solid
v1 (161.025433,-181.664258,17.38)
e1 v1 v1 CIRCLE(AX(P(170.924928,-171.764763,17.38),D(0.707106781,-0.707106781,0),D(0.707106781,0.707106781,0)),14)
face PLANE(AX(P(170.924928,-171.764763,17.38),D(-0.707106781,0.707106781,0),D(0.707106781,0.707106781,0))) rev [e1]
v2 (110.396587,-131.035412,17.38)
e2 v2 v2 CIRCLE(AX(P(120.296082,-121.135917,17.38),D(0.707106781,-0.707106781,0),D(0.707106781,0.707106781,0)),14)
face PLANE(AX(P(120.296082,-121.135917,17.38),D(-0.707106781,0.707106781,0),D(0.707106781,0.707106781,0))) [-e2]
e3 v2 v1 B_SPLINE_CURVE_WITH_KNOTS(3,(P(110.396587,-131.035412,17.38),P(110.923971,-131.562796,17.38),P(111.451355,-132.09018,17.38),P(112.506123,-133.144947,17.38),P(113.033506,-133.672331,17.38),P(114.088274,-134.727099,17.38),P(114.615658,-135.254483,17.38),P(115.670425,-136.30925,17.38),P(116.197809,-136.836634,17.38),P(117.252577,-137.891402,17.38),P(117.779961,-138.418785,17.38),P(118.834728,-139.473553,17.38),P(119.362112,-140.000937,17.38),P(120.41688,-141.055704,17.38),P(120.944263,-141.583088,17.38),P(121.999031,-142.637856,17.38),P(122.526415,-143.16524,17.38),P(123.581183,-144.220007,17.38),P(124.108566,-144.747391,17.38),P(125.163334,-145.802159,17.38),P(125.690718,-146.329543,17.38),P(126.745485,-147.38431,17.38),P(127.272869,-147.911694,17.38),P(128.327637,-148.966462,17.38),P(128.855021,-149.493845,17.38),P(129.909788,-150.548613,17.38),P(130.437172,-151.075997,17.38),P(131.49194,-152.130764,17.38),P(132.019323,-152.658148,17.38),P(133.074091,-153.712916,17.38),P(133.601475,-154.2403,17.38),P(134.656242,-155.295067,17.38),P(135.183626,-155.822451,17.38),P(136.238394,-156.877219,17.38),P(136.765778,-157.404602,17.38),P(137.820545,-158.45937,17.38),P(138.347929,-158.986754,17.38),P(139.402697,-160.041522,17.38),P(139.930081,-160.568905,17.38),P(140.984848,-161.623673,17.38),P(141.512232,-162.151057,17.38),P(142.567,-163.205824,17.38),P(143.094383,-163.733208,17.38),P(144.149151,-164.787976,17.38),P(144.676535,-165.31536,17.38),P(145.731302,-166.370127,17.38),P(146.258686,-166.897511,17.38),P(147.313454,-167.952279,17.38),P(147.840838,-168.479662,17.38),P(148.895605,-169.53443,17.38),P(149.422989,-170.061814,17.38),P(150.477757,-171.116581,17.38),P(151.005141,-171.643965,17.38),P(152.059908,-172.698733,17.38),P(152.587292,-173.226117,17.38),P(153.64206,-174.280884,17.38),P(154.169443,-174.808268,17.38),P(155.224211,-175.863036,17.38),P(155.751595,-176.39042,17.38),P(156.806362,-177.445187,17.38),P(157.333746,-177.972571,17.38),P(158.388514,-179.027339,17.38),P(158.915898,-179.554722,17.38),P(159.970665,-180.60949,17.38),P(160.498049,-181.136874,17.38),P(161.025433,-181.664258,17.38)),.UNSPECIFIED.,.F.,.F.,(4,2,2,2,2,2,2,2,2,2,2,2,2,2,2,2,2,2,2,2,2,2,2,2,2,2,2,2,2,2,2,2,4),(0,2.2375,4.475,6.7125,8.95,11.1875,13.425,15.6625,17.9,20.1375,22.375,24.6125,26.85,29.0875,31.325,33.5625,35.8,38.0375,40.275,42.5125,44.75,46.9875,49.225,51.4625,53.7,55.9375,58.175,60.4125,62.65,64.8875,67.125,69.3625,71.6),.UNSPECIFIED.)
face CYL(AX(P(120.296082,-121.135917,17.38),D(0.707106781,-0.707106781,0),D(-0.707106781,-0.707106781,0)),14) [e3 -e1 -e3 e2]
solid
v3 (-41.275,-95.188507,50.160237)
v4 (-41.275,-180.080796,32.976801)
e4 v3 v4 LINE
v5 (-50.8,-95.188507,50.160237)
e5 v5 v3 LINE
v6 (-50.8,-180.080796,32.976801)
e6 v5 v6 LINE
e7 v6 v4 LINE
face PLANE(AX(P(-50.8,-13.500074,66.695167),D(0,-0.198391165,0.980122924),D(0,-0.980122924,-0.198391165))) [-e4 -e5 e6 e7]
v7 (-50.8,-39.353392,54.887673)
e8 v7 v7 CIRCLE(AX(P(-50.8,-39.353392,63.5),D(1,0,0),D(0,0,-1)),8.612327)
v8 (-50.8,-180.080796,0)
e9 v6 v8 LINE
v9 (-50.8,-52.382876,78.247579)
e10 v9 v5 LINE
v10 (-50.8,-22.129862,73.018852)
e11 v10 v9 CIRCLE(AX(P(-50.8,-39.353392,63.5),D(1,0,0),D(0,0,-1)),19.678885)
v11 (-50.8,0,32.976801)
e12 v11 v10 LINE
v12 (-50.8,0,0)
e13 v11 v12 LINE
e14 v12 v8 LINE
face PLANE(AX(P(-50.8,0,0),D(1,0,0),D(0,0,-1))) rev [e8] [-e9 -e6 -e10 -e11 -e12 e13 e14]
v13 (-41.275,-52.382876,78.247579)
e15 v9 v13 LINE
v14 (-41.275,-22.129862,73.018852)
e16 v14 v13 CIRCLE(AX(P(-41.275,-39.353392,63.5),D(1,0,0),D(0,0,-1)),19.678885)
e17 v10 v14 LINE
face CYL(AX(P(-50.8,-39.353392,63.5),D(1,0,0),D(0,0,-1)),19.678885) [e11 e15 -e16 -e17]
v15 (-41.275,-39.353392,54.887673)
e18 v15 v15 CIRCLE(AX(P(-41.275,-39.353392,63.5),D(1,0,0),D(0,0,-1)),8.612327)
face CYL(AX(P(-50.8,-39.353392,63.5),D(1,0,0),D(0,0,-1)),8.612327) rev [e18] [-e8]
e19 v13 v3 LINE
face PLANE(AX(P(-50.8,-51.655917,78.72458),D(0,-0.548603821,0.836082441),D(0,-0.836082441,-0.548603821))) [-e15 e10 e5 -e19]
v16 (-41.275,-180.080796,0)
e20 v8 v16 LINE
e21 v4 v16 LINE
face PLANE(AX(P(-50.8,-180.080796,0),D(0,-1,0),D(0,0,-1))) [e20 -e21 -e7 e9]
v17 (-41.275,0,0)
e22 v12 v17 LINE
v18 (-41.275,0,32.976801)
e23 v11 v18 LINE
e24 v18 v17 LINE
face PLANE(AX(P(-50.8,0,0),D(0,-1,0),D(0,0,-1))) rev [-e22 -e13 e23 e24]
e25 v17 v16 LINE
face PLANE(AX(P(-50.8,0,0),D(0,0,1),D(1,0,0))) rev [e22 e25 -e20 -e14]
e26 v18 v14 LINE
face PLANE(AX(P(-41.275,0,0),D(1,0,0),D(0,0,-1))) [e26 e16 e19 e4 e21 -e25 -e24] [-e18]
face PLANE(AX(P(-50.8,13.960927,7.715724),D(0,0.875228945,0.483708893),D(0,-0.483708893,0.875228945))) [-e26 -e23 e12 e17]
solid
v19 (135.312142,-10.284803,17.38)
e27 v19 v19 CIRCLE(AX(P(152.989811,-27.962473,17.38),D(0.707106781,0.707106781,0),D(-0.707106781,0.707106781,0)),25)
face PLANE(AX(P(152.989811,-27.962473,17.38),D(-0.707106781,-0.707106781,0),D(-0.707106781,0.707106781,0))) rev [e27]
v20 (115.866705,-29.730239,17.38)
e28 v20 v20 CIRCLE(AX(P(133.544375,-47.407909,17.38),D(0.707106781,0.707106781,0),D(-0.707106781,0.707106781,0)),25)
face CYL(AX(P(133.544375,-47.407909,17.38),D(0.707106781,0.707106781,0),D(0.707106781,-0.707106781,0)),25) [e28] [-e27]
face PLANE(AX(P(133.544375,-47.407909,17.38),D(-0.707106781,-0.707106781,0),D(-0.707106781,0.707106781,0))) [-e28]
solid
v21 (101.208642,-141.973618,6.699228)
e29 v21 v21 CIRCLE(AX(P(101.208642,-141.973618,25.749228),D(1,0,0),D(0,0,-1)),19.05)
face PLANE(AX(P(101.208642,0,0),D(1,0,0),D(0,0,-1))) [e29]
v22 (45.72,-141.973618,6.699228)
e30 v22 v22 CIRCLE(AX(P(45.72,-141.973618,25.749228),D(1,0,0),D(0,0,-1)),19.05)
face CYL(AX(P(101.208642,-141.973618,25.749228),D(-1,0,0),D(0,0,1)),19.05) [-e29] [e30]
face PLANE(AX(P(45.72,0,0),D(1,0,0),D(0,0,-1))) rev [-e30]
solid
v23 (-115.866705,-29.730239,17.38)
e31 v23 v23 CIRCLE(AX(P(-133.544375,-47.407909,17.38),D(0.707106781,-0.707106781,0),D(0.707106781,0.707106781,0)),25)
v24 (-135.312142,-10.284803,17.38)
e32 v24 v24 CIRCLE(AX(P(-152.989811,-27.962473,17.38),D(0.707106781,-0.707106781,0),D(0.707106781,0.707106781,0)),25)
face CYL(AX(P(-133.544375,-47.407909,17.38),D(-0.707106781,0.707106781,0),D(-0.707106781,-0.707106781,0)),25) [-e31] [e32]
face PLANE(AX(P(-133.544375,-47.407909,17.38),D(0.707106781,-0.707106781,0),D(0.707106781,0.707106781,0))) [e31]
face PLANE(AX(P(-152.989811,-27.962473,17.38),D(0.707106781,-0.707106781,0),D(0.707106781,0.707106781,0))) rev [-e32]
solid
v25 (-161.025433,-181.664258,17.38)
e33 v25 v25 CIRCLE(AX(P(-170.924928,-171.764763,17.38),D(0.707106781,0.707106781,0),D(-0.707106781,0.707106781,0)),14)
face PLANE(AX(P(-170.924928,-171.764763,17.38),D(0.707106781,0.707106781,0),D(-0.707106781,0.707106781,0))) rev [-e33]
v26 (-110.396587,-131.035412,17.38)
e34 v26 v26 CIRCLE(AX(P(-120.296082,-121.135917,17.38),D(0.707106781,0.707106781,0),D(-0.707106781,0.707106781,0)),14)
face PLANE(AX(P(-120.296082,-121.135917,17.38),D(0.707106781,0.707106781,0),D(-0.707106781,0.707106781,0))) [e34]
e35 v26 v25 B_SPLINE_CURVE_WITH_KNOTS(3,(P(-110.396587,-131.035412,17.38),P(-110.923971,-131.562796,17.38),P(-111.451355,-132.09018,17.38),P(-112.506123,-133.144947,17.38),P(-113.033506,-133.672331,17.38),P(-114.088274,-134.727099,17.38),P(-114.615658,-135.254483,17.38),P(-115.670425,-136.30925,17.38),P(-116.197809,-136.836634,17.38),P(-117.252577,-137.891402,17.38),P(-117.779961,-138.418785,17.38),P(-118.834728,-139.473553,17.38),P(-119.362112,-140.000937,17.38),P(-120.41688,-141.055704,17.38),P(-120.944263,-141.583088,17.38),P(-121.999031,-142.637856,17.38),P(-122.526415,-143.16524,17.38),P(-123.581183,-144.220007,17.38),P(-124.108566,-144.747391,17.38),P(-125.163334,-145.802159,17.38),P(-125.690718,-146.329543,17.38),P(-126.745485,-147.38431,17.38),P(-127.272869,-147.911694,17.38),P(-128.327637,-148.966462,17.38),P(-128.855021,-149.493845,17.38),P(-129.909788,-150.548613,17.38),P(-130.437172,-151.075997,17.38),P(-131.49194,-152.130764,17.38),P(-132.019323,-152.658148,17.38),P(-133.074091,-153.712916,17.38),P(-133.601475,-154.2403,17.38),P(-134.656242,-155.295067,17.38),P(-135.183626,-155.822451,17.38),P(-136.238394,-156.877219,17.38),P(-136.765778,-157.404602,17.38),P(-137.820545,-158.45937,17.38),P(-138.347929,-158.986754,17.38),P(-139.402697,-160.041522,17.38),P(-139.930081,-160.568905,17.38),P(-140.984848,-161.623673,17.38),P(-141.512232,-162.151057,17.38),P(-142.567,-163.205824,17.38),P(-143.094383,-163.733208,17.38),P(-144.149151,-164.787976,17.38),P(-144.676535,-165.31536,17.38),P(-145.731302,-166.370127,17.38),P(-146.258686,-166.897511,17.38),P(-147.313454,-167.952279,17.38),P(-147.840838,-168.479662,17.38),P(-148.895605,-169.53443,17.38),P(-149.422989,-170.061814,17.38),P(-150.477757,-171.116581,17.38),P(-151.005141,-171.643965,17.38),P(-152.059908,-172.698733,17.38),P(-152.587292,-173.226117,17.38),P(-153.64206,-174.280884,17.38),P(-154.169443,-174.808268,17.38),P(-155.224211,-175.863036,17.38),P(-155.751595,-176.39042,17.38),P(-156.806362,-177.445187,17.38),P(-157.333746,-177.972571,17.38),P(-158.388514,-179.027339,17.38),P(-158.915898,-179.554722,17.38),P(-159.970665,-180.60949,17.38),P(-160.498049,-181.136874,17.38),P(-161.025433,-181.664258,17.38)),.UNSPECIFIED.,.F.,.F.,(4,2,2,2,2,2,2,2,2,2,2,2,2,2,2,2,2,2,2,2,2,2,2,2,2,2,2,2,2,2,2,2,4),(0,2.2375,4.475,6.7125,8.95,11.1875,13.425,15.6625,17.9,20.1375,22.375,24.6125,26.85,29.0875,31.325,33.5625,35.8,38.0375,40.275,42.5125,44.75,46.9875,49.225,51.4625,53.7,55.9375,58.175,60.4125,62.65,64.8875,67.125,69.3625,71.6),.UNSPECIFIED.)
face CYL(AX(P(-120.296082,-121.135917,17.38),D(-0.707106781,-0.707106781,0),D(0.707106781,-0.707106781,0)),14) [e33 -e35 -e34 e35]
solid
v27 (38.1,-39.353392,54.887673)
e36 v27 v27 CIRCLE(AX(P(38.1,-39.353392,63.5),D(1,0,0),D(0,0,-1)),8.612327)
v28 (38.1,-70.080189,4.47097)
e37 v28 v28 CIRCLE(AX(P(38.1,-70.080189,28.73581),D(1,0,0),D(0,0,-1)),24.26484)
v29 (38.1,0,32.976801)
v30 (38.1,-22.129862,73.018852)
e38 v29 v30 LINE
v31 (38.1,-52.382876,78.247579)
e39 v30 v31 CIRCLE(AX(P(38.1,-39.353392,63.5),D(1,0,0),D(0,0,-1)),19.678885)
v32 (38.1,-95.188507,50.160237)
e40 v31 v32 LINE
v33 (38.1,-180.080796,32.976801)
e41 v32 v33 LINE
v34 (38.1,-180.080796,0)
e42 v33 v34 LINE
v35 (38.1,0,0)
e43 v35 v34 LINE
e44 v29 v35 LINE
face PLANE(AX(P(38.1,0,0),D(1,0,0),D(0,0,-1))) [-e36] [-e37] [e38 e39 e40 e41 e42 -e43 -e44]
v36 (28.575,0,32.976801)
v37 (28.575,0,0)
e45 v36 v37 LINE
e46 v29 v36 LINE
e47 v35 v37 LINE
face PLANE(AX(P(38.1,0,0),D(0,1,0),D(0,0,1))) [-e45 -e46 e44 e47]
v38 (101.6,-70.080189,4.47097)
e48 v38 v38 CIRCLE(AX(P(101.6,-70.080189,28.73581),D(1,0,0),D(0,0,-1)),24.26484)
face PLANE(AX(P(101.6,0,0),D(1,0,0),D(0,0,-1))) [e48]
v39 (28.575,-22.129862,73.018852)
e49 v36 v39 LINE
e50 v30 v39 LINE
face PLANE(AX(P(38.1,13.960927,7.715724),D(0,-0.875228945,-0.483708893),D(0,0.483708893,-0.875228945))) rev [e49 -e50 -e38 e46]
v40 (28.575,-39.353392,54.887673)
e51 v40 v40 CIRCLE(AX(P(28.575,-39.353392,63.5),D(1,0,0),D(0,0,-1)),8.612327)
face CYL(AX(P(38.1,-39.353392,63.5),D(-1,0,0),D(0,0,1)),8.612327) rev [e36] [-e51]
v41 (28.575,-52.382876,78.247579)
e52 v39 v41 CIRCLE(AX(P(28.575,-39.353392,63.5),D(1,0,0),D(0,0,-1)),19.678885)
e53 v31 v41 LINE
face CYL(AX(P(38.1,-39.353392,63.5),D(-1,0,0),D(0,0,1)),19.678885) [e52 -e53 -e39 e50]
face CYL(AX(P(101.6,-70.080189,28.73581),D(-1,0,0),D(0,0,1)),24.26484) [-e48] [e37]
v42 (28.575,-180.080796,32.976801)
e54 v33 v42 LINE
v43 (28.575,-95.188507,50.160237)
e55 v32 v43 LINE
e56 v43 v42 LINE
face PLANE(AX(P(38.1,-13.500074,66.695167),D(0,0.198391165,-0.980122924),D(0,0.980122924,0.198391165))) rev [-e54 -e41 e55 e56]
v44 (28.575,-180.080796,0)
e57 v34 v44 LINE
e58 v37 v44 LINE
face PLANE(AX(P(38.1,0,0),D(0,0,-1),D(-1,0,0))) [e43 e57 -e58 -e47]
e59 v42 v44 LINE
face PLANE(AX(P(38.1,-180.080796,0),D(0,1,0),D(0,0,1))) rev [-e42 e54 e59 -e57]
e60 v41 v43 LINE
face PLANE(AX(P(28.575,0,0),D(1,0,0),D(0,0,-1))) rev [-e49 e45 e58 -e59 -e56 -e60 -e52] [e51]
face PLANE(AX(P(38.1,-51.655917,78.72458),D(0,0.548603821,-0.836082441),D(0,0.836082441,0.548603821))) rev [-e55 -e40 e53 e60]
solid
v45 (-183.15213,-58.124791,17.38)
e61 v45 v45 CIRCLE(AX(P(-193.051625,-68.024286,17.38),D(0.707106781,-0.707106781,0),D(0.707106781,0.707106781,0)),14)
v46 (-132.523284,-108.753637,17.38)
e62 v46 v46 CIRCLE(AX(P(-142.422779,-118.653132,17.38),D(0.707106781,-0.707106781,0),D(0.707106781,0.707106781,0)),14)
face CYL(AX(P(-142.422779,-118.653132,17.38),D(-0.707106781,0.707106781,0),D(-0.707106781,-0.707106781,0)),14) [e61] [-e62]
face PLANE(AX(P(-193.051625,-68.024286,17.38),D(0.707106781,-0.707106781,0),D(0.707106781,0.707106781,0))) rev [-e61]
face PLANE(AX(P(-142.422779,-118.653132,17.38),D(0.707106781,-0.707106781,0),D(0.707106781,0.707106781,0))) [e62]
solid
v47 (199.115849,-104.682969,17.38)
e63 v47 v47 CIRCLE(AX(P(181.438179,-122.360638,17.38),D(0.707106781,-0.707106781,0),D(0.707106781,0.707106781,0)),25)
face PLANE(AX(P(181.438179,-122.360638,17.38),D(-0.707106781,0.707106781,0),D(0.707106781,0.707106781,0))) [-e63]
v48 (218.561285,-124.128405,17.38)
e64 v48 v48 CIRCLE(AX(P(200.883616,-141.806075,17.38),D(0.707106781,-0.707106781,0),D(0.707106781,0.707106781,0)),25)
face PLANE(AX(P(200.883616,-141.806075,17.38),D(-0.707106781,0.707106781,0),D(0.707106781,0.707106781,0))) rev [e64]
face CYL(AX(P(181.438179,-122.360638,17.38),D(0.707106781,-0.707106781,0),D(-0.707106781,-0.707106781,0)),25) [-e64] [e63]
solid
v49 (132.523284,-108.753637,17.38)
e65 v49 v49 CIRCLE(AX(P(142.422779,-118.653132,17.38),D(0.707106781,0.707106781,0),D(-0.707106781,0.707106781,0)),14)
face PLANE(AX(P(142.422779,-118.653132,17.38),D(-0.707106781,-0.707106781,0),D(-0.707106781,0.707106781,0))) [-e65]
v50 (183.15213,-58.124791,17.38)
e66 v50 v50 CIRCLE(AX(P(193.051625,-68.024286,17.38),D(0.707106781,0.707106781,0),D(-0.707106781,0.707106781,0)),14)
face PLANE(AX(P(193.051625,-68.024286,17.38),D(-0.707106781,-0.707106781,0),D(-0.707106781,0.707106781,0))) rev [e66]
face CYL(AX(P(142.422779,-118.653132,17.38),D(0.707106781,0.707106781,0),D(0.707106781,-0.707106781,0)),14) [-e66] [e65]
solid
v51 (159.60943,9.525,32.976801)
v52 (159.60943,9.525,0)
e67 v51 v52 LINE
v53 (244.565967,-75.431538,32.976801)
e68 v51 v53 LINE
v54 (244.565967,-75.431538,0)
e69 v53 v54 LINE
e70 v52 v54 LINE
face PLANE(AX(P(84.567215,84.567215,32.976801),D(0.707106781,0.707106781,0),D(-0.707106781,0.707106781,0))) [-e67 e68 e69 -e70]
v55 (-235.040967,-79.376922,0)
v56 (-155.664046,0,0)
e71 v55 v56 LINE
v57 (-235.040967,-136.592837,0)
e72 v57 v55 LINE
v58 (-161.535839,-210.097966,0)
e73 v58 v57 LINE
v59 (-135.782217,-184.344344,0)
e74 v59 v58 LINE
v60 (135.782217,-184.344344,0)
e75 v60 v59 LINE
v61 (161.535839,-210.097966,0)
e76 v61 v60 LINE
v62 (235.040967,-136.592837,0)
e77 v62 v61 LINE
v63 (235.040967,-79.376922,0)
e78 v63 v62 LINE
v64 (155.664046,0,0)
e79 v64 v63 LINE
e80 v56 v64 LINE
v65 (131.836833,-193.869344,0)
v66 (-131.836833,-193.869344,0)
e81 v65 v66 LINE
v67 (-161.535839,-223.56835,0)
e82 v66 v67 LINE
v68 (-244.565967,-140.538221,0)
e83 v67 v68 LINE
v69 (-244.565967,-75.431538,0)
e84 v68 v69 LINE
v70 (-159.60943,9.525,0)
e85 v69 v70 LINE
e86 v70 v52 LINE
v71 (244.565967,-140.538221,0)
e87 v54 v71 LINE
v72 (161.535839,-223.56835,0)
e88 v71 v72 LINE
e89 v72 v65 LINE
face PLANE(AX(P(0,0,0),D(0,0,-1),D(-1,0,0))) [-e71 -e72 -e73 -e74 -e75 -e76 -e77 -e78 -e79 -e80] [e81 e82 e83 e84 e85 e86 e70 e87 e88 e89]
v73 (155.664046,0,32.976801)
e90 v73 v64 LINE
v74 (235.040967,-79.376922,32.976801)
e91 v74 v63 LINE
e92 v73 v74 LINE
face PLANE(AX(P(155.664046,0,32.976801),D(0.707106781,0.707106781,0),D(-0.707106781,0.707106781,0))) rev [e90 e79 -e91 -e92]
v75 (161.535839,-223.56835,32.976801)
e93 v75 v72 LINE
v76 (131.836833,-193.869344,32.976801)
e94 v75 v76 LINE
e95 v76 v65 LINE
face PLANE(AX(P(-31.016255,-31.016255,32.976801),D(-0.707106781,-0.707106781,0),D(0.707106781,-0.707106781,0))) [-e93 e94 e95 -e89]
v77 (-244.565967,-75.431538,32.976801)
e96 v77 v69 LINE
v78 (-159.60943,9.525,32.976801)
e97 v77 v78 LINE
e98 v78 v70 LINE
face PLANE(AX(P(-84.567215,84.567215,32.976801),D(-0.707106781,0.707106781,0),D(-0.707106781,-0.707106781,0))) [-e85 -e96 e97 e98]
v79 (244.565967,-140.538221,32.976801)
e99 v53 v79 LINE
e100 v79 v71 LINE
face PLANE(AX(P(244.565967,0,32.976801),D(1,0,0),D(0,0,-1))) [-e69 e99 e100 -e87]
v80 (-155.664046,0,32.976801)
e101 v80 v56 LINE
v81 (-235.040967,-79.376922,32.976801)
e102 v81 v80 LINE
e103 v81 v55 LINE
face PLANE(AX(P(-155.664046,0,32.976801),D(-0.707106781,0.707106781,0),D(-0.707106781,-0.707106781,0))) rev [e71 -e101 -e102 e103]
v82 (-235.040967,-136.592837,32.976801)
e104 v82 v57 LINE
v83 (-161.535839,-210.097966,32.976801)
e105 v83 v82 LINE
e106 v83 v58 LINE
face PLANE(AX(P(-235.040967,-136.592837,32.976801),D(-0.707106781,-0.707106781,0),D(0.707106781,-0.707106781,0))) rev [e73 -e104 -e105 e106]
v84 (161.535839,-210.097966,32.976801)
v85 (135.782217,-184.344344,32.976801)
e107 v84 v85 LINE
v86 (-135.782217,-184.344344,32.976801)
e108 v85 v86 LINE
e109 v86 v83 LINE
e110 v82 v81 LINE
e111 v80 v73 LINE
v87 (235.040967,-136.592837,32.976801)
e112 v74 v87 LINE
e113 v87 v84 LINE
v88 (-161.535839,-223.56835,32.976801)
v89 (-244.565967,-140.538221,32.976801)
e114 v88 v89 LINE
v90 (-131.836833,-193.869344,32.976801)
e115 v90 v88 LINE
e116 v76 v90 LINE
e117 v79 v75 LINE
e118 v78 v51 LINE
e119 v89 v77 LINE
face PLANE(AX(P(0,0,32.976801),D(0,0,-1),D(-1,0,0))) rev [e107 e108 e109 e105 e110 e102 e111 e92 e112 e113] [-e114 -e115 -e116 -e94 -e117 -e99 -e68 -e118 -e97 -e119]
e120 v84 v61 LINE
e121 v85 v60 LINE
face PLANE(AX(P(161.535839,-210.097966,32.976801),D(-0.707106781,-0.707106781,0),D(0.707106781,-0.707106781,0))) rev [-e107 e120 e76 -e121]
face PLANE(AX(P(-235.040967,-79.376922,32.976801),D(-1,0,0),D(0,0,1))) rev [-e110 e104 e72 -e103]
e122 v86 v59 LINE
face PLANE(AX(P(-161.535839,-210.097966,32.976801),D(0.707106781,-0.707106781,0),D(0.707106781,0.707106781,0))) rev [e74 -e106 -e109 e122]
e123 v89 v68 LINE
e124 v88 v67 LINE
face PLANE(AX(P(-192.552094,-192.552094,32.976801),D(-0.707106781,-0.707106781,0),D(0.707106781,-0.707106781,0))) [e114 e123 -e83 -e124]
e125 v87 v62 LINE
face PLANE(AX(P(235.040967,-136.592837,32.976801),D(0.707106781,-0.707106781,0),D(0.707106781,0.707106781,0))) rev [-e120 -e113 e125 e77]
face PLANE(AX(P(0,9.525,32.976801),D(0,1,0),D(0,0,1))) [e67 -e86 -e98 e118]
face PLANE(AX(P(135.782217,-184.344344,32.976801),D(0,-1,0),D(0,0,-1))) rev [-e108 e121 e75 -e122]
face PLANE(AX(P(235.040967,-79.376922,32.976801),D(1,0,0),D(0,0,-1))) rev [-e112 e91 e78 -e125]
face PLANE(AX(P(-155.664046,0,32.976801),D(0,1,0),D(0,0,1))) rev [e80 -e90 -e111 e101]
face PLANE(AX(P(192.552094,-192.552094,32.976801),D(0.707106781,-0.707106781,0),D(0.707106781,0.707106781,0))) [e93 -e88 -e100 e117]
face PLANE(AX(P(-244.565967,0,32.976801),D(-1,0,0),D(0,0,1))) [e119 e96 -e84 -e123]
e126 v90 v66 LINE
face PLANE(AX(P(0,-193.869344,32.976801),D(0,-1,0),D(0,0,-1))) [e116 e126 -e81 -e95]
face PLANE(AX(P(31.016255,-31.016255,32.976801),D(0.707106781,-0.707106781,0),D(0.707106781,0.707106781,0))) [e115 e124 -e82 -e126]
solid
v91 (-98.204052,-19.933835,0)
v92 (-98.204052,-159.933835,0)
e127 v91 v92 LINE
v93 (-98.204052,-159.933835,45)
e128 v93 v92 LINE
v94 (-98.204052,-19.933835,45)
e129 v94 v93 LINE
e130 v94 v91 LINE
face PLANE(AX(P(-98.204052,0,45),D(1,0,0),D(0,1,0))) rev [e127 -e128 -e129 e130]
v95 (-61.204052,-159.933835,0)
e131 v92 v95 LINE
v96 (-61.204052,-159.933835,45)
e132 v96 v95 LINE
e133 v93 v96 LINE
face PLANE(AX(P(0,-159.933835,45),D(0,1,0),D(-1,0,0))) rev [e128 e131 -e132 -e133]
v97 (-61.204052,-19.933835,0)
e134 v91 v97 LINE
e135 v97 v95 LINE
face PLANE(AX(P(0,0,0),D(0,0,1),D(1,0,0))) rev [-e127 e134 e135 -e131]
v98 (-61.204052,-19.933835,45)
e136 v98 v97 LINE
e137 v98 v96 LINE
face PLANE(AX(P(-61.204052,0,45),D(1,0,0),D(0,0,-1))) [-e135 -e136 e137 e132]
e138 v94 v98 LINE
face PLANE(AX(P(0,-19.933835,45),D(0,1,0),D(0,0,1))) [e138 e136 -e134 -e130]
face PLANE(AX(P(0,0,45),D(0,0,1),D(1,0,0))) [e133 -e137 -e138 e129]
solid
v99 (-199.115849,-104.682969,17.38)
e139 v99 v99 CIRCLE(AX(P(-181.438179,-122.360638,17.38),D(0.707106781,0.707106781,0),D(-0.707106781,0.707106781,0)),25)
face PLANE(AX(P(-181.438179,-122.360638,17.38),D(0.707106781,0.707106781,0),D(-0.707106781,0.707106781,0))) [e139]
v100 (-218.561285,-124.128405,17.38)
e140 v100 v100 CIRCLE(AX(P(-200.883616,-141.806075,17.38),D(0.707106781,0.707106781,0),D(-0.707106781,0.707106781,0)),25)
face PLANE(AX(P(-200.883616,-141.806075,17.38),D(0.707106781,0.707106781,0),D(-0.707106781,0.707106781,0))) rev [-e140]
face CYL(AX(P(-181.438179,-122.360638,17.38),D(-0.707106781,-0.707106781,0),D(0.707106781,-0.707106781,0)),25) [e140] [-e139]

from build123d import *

# Parameters (mm, degrees)
BOSS_EXTRUDE1_OUTLINE_W = 37
BOSS_EXTRUDE1_OUTLINE_H = 140
BOSS_EXTRUDE1_DEPTH     = 45
BOSS_EXTRUDE10_START    = 45.72
SKETCH9_R               = 19.05
BOSS_EXTRUDE10_DEPTH    = 55.488642
BOSS_EXTRUDE11_START    = 38.1
SKETCH9_3_R             = 24.264839711
BOSS_EXTRUDE11_DEPTH    = 63.5
SKETCH2_R               = 25
BOSS_EXTRUDE6_DEPTH     = 27.5
SKETCH3_R               = 25
BOSS_EXTRUDE7_DEPTH     = 27.5
SKETCH4_R               = 14
BOSS_EXTRUDE8_DEPTH     = 71.6
SKETCH5_R               = 14
BOSS_EXTRUDE9_DEPTH     = 71.6
BOSS_EXTRUDE12_START    = -41.275
SKETCH8_R               = 8.612326573
BOSS_EXTRUDE12_DEPTH    = 9.525
BOSS_EXTRUDE13_START    = 28.575
SKETCH8_3_R             = 8.612326573
BOSS_EXTRUDE13_DEPTH    = 9.525
EXTRUDE_THIN2_DEPTH     = 32.9768


# Read off the part's stored shape, not the designer's step: Boss-Extrude1
with BuildPart() as part:
    # Boss-Extrude1 outline → Boss-Extrude1 (new body)
    with BuildSketch(Plane.XY):
        with Locations((-79.704052147, -89.933835326)):
            Rectangle(BOSS_EXTRUDE1_OUTLINE_W, BOSS_EXTRUDE1_OUTLINE_H)
    extrude(amount=BOSS_EXTRUDE1_DEPTH)


with BuildPart() as body_2:
    # Sketch9 → Boss-Extrude10 (new body)
    with BuildSketch(Plane(origin=(0, 0, 0), x_dir=(0, 0, -1), z_dir=(1, 0, 0)).offset(BOSS_EXTRUDE10_START)):
        with Locations((-25.749228435, -141.973618126)):
            Circle(SKETCH9_R)
    extrude(amount=BOSS_EXTRUDE10_DEPTH)


with BuildPart() as body_3:
    # Sketch9<3> → Boss-Extrude11 (new body)
    with BuildSketch(Plane(origin=(0, 0, 0), x_dir=(0, 0, -1), z_dir=(1, 0, 0)).offset(BOSS_EXTRUDE11_START)):
        with Locations((-28.735809635, -70.080189422)):
            Circle(SKETCH9_3_R)
    extrude(amount=BOSS_EXTRUDE11_DEPTH)

    # Sketch8<3> → Boss-Extrude13 (add)
    with BuildSketch(Plane(origin=(0, 0, 0), x_dir=(0, 0, -1), z_dir=(1, 0, 0)).offset(BOSS_EXTRUDE13_START)):
        with BuildLine():
            Line((-32.976800838, 0), (-73.018851768, -22.129862401))
            ThreePointArc((-73.018851768, -22.129862401), (-82.891392915, -36.001914614), (-78.247578803, -52.382875873))
            Line((-78.247578803, -52.382875873), (-50.160237425, -95.1885073))
            Line((-50.160237425, -95.1885073), (-32.976800838, -180.080796112))
            Line((-32.976800838, -180.080796112), (0, -180.080796112))
            Line((0, -180.080796112), (0, 0))
            Line((0, 0), (-32.976800838, 0))
        make_face()
        with Locations((-63.5, -39.353392326)):
            Circle(SKETCH8_3_R, mode=Mode.SUBTRACT)
    extrude(amount=BOSS_EXTRUDE13_DEPTH)


with BuildPart() as body_4:
    # Sketch2 → Boss-Extrude6 (new body)
    with BuildSketch(Plane(origin=(-62.5136693, 62.5136693, 0), x_dir=(0, 0, 1), z_dir=(0.707106781186475, -0.7071067811866201, 0))):
        with Locations(Location((17.38, 127.952586842, 0), (0, 0, 270))):
            Circle(SKETCH2_R)
    extrude(amount=BOSS_EXTRUDE6_DEPTH)


with BuildPart() as body_5:
    # Sketch3 → Boss-Extrude7 (new body)
    with BuildSketch(Plane(origin=(-171.344845243, -171.344845243, 0), x_dir=(0, 0, -1), z_dir=(0.7071067811866171, 0.7071067811864781, 0))):
        with Locations(Location((-17.38, 41.774129956, 0), (0, 0, 90))):
            Circle(SKETCH3_R)
    extrude(amount=BOSS_EXTRUDE7_DEPTH)


with BuildPart() as body_6:
    # Sketch4 → Boss-Extrude8 (new body)
    with BuildSketch(Plane(origin=(-62.5136693, 62.5136693, 0), x_dir=(0, 0, 1), z_dir=(0.707106781186475, -0.7071067811866201, 0))):
        with Locations(Location((17.38, 184.60854676, 0), (0, 0, 270))):
            Circle(SKETCH4_R)
    extrude(amount=BOSS_EXTRUDE8_DEPTH)


with BuildPart() as body_7:
    # Sketch5 → Boss-Extrude9 (new body)
    with BuildSketch(Plane(origin=(-171.344845243, -171.344845243, 0), x_dir=(0, 0, -1), z_dir=(0.7071067811866171, 0.7071067811864781, 0))):
        with Locations(Location((-17.38, -0.593852938, 0), (0, 0, 270))):
            Circle(SKETCH5_R)
    extrude(amount=BOSS_EXTRUDE9_DEPTH)


with BuildPart() as body_8:
    # Sketch8 → Boss-Extrude12 (new body)
    with BuildSketch(Plane(origin=(0, 0, 0), x_dir=(0, 0, -1), z_dir=(1, 0, 0)).offset(BOSS_EXTRUDE12_START)):
        with BuildLine():
            Line((-32.976800838, 0), (-73.018851768, -22.129862401))
            ThreePointArc((-73.018851768, -22.129862401), (-82.891392915, -36.001914614), (-78.247578803, -52.382875873))
            Line((-78.247578803, -52.382875873), (-50.160237425, -95.1885073))
            Line((-50.160237425, -95.1885073), (-32.976800838, -180.080796112))
            Line((-32.976800838, -180.080796112), (0, -180.080796112))
            Line((0, -180.080796112), (0, 0))
            Line((0, 0), (-32.976800838, 0))
        make_face()
        with Locations((-63.5, -39.353392326)):
            Circle(SKETCH8_R, mode=Mode.SUBTRACT)
    extrude(amount=-BOSS_EXTRUDE12_DEPTH)


with BuildPart() as body_9:
    # Mirror3: mirrored copy
    add(body_4.part.mirror(Plane(origin=(0, 0, 0), x_dir=(0, 0, 1), z_dir=(1, 0, 0))))


with BuildPart() as body_10:
    # Mirror3 2: mirrored copy
    add(body_6.part.mirror(Plane(origin=(0, 0, 0), x_dir=(0, 0, 1), z_dir=(1, 0, 0))))


with BuildPart() as body_11:
    # Mirror3 3: mirrored copy
    add(body_5.part.mirror(Plane(origin=(0, 0, 0), x_dir=(0, 0, 1), z_dir=(1, 0, 0))))


with BuildPart() as body_12:
    # Mirror3 4: mirrored copy
    add(body_7.part.mirror(Plane(origin=(0, 0, 0), x_dir=(0, 0, 1), z_dir=(1, 0, 0))))


with BuildPart() as body_13:
    # Sketch10 → Extrude-Thin2 (new body)
    with BuildSketch(Plane(origin=(0, 0, 0), x_dir=(-1, 0, 0), z_dir=(0, 0, -1))):
        Polygon((159.609429883, 9.525), (-159.609429883, 9.525), (-244.565967416, -75.431537533), (-244.565967416, -140.538221375), (-161.535839062, -223.568349729), (-131.836833268, -193.869343934), (131.836833268, -193.869343934), (161.535839062, -223.568349729), (244.565967416, -140.538221375), (244.565967416, -75.431537533), align=None)
        Polygon((155.664045701, 0), (-155.664045701, 0), (-235.040967416, -79.376921715), (-235.040967416, -136.592837193), (-161.535839062, -210.097965547), (-135.782217449, -184.344343934), (135.782217449, -184.344343934), (161.535839062, -210.097965547), (235.040967416, -136.592837193), (235.040967416, -79.376921715), align=None, mode=Mode.SUBTRACT)
    extrude(amount=-EXTRUDE_THIN2_DEPTH)


solid = Compound([part.part, body_2.part, body_3.part, body_4.part, body_5.part, body_6.part, body_7.part, body_8.part, body_9.part, body_10.part, body_11.part, body_12.part, body_13.part])
